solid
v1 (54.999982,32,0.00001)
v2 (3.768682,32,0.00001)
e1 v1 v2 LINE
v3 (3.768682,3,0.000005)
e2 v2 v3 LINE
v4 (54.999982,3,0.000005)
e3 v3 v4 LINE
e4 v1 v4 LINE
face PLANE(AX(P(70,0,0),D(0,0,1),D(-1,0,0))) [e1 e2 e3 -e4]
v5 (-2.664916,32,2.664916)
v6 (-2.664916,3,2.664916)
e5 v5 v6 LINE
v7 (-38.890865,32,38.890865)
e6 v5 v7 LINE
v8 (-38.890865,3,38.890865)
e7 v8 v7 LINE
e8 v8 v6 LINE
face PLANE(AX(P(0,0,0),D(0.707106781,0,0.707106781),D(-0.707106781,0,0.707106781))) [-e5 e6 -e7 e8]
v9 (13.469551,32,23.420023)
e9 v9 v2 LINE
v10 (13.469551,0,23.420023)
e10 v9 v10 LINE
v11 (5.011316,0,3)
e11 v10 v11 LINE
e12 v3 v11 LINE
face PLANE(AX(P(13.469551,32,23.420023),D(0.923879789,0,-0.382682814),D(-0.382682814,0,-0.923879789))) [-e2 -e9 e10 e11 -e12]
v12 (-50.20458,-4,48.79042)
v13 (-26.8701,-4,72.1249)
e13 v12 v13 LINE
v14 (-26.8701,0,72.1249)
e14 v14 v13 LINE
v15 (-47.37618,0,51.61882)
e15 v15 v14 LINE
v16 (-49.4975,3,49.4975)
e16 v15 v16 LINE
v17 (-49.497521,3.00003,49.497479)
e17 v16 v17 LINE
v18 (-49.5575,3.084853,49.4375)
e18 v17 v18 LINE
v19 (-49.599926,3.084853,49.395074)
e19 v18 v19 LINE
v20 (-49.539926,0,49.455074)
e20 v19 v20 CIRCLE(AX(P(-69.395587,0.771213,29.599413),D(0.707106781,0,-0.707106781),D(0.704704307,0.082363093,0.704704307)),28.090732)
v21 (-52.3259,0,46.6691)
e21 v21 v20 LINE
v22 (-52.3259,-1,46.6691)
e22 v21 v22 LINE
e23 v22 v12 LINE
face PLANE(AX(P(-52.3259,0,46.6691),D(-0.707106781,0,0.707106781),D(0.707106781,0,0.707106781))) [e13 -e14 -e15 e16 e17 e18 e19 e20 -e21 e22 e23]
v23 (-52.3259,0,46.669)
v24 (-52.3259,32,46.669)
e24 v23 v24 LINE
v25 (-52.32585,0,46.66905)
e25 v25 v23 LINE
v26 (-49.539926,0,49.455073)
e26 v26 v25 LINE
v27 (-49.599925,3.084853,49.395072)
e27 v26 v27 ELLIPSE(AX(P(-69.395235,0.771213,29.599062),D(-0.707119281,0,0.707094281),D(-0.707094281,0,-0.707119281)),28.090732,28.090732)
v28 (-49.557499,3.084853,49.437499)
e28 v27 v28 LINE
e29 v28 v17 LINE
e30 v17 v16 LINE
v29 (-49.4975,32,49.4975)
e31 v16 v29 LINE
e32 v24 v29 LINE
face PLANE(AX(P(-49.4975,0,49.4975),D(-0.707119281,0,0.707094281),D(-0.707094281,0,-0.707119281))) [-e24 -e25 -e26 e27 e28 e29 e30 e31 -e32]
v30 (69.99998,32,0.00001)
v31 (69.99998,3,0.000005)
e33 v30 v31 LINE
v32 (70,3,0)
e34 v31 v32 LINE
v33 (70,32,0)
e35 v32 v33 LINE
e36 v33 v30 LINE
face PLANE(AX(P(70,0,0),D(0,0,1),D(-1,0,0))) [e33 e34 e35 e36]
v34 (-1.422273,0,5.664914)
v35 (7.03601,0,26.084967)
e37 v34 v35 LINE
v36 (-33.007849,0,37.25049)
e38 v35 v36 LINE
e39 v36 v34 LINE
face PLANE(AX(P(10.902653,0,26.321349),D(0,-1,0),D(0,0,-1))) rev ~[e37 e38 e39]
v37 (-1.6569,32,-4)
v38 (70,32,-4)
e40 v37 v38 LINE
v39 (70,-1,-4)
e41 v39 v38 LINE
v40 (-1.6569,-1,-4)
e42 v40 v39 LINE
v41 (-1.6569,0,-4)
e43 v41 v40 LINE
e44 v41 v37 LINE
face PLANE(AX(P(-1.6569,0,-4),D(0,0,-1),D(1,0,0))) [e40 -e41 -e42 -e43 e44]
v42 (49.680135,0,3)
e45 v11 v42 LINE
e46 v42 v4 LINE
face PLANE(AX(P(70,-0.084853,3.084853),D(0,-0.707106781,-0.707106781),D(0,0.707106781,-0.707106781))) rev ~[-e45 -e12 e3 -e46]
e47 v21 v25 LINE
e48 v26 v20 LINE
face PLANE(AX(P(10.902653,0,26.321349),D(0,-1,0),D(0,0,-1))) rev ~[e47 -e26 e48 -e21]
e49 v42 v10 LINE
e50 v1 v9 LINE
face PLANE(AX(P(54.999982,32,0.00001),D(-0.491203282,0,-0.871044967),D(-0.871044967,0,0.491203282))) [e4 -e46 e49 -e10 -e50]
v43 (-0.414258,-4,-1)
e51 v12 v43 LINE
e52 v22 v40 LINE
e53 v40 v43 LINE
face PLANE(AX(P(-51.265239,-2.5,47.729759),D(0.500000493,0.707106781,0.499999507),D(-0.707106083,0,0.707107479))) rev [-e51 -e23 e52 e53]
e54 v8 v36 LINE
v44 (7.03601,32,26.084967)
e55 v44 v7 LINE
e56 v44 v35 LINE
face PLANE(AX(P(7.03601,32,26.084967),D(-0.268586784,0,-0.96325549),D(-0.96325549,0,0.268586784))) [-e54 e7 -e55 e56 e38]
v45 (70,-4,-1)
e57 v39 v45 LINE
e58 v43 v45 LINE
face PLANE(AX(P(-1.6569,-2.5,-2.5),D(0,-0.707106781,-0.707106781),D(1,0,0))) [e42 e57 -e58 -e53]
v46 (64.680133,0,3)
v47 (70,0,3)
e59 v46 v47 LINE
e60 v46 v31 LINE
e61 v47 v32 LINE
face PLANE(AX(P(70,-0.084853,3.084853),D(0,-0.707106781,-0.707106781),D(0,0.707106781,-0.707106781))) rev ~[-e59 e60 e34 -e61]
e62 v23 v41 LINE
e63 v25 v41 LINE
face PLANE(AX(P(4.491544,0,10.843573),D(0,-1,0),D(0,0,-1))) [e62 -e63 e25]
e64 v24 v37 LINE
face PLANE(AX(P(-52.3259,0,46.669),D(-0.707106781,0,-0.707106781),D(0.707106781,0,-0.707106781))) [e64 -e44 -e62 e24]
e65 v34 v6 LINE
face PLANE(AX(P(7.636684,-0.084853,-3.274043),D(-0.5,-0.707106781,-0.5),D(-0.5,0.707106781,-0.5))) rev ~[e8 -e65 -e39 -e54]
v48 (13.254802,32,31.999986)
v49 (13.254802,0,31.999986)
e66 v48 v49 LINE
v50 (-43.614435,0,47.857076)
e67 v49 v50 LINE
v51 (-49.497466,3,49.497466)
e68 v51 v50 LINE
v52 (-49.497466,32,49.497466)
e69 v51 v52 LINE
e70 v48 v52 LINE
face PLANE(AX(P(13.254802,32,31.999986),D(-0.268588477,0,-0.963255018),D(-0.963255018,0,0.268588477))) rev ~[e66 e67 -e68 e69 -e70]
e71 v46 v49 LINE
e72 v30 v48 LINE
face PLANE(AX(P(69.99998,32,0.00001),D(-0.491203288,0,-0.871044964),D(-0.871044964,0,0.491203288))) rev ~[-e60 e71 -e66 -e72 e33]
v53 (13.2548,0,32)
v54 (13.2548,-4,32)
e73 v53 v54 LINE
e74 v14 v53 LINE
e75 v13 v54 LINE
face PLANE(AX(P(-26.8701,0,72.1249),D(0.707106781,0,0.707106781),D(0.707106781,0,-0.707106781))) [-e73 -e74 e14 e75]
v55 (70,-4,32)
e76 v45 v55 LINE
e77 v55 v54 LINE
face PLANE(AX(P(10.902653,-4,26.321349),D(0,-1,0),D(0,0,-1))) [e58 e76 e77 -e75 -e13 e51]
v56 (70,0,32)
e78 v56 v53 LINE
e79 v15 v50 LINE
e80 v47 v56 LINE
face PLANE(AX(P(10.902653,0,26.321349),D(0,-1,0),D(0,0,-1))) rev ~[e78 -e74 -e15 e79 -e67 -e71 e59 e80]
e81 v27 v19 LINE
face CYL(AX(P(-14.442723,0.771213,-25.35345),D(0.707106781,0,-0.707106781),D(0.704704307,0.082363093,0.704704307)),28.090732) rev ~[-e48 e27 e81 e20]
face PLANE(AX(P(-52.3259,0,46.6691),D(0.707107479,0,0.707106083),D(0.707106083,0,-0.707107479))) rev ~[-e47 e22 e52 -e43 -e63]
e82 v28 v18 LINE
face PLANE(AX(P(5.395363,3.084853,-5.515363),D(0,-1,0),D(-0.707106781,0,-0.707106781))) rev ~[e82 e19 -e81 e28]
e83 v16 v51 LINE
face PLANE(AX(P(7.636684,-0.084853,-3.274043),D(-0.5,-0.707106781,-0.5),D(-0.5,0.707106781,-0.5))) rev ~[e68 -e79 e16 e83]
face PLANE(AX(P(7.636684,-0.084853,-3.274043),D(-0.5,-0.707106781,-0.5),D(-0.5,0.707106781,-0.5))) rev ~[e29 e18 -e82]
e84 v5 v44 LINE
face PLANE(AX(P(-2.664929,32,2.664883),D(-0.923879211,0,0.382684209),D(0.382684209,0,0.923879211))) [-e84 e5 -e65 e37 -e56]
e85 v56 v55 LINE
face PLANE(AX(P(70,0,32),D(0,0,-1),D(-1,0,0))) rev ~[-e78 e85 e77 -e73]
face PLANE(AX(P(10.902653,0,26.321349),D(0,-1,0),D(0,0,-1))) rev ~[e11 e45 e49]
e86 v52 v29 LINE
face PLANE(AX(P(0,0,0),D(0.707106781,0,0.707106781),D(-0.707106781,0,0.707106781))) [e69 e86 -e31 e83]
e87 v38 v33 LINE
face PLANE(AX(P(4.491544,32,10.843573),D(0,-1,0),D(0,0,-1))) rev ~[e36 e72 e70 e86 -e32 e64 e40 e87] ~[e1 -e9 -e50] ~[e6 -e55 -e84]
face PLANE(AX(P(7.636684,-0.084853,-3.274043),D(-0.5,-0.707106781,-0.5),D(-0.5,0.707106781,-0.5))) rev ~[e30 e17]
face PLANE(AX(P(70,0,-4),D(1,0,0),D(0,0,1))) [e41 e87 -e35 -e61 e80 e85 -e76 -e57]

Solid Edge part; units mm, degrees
sketch "Sketch1" plane through (0, 0, 0) normal (0, -1, 0) x (1, 0, 0)
  line L0 (0, 0) -> (-49.4975, 49.4975)
  line L1 (-49.4975, 49.4975) -> (-52.3259, 46.669)
  line L2 (-52.3259, 46.669) -> (-1.6569, -4)
  line L3 (-1.6569, -4) -> (70, -4)
  line L4 (70, -4) -> (70, 0)
  line L5 (70, 0) -> (0, 0)
  dimension "D1" = 4
  dimension "D2" = 4
  dimension "D3" = 70
extrude "Protrusion1" add sketch "Sketch1" against normal blind 32
sketch "Sketch2" plane through (5.9081, 0, 15.6777) normal (0, -1, 0) x (1, 0, 0)
  line L0 (-58.234, 30.9914) -> (-7.565, -19.6777)
  line L1 (-7.565, -19.6777) -> (64.0919, -19.6777)
  line L2 (64.0919, -19.6777) -> (64.0919, 16.3223)
  line L3 (64.0919, 16.3223) -> (7.3467, 16.3223)
  line L4 (-32.7782, 56.4472) -> (7.3467, 16.3223)
  line L5 (-58.234, 30.9914) -> (-32.7782, 56.4472)
  dimension "D1" = 36
extrude "Extrusionsausprägung_2" add sketch "Sketch2" along normal blind 4
chamfer "Fase_1" distance 3 angle 45 2 edges at (34.1716, -4, -4) (-26.9914, -4, 21.3345)
chamfer "Fase_2" distance 3 angle 45 2 edges at (35, 0, 0) (-24.7487, 0, 24.7487)
sketch "Sketch3" plane through (10.3015, 32, 26.2843) normal (0, 1, 0) x (-0.7071068, 0, 0.7071068)
  line L0 (-60.799, 23.6274) -> (1.9533, 6.1299)
  line L1 (1.9533, 6.1299) -> (58.6985, -25.8701)
  line L2 (58.6985, -25.8701) -> (43.6985, -25.8701)
  line L3 (2.1681, -2.45) -> (43.6985, -25.8701)
  line L4 (-7.5328, -25.8701) -> (2.1681, -2.45)
  line L5 (-11.3015, -25.8701) -> (-7.5328, -25.8701)
  line L6 (-13.9664, -23.2052) -> (-11.3015, -25.8701)
  line L7 (-4.2655, 0.2148) -> (-13.9664, -23.2052)
  line L8 (-50.1924, 13.0208) -> (-4.2655, 0.2148)
  line L9 (-60.799, 23.6274) -> (-50.1924, 13.0208)
  dimension "D1" = 15
extrude "Protrusion2" add sketch "Sketch3" against normal up to vertex (32 mm away)
